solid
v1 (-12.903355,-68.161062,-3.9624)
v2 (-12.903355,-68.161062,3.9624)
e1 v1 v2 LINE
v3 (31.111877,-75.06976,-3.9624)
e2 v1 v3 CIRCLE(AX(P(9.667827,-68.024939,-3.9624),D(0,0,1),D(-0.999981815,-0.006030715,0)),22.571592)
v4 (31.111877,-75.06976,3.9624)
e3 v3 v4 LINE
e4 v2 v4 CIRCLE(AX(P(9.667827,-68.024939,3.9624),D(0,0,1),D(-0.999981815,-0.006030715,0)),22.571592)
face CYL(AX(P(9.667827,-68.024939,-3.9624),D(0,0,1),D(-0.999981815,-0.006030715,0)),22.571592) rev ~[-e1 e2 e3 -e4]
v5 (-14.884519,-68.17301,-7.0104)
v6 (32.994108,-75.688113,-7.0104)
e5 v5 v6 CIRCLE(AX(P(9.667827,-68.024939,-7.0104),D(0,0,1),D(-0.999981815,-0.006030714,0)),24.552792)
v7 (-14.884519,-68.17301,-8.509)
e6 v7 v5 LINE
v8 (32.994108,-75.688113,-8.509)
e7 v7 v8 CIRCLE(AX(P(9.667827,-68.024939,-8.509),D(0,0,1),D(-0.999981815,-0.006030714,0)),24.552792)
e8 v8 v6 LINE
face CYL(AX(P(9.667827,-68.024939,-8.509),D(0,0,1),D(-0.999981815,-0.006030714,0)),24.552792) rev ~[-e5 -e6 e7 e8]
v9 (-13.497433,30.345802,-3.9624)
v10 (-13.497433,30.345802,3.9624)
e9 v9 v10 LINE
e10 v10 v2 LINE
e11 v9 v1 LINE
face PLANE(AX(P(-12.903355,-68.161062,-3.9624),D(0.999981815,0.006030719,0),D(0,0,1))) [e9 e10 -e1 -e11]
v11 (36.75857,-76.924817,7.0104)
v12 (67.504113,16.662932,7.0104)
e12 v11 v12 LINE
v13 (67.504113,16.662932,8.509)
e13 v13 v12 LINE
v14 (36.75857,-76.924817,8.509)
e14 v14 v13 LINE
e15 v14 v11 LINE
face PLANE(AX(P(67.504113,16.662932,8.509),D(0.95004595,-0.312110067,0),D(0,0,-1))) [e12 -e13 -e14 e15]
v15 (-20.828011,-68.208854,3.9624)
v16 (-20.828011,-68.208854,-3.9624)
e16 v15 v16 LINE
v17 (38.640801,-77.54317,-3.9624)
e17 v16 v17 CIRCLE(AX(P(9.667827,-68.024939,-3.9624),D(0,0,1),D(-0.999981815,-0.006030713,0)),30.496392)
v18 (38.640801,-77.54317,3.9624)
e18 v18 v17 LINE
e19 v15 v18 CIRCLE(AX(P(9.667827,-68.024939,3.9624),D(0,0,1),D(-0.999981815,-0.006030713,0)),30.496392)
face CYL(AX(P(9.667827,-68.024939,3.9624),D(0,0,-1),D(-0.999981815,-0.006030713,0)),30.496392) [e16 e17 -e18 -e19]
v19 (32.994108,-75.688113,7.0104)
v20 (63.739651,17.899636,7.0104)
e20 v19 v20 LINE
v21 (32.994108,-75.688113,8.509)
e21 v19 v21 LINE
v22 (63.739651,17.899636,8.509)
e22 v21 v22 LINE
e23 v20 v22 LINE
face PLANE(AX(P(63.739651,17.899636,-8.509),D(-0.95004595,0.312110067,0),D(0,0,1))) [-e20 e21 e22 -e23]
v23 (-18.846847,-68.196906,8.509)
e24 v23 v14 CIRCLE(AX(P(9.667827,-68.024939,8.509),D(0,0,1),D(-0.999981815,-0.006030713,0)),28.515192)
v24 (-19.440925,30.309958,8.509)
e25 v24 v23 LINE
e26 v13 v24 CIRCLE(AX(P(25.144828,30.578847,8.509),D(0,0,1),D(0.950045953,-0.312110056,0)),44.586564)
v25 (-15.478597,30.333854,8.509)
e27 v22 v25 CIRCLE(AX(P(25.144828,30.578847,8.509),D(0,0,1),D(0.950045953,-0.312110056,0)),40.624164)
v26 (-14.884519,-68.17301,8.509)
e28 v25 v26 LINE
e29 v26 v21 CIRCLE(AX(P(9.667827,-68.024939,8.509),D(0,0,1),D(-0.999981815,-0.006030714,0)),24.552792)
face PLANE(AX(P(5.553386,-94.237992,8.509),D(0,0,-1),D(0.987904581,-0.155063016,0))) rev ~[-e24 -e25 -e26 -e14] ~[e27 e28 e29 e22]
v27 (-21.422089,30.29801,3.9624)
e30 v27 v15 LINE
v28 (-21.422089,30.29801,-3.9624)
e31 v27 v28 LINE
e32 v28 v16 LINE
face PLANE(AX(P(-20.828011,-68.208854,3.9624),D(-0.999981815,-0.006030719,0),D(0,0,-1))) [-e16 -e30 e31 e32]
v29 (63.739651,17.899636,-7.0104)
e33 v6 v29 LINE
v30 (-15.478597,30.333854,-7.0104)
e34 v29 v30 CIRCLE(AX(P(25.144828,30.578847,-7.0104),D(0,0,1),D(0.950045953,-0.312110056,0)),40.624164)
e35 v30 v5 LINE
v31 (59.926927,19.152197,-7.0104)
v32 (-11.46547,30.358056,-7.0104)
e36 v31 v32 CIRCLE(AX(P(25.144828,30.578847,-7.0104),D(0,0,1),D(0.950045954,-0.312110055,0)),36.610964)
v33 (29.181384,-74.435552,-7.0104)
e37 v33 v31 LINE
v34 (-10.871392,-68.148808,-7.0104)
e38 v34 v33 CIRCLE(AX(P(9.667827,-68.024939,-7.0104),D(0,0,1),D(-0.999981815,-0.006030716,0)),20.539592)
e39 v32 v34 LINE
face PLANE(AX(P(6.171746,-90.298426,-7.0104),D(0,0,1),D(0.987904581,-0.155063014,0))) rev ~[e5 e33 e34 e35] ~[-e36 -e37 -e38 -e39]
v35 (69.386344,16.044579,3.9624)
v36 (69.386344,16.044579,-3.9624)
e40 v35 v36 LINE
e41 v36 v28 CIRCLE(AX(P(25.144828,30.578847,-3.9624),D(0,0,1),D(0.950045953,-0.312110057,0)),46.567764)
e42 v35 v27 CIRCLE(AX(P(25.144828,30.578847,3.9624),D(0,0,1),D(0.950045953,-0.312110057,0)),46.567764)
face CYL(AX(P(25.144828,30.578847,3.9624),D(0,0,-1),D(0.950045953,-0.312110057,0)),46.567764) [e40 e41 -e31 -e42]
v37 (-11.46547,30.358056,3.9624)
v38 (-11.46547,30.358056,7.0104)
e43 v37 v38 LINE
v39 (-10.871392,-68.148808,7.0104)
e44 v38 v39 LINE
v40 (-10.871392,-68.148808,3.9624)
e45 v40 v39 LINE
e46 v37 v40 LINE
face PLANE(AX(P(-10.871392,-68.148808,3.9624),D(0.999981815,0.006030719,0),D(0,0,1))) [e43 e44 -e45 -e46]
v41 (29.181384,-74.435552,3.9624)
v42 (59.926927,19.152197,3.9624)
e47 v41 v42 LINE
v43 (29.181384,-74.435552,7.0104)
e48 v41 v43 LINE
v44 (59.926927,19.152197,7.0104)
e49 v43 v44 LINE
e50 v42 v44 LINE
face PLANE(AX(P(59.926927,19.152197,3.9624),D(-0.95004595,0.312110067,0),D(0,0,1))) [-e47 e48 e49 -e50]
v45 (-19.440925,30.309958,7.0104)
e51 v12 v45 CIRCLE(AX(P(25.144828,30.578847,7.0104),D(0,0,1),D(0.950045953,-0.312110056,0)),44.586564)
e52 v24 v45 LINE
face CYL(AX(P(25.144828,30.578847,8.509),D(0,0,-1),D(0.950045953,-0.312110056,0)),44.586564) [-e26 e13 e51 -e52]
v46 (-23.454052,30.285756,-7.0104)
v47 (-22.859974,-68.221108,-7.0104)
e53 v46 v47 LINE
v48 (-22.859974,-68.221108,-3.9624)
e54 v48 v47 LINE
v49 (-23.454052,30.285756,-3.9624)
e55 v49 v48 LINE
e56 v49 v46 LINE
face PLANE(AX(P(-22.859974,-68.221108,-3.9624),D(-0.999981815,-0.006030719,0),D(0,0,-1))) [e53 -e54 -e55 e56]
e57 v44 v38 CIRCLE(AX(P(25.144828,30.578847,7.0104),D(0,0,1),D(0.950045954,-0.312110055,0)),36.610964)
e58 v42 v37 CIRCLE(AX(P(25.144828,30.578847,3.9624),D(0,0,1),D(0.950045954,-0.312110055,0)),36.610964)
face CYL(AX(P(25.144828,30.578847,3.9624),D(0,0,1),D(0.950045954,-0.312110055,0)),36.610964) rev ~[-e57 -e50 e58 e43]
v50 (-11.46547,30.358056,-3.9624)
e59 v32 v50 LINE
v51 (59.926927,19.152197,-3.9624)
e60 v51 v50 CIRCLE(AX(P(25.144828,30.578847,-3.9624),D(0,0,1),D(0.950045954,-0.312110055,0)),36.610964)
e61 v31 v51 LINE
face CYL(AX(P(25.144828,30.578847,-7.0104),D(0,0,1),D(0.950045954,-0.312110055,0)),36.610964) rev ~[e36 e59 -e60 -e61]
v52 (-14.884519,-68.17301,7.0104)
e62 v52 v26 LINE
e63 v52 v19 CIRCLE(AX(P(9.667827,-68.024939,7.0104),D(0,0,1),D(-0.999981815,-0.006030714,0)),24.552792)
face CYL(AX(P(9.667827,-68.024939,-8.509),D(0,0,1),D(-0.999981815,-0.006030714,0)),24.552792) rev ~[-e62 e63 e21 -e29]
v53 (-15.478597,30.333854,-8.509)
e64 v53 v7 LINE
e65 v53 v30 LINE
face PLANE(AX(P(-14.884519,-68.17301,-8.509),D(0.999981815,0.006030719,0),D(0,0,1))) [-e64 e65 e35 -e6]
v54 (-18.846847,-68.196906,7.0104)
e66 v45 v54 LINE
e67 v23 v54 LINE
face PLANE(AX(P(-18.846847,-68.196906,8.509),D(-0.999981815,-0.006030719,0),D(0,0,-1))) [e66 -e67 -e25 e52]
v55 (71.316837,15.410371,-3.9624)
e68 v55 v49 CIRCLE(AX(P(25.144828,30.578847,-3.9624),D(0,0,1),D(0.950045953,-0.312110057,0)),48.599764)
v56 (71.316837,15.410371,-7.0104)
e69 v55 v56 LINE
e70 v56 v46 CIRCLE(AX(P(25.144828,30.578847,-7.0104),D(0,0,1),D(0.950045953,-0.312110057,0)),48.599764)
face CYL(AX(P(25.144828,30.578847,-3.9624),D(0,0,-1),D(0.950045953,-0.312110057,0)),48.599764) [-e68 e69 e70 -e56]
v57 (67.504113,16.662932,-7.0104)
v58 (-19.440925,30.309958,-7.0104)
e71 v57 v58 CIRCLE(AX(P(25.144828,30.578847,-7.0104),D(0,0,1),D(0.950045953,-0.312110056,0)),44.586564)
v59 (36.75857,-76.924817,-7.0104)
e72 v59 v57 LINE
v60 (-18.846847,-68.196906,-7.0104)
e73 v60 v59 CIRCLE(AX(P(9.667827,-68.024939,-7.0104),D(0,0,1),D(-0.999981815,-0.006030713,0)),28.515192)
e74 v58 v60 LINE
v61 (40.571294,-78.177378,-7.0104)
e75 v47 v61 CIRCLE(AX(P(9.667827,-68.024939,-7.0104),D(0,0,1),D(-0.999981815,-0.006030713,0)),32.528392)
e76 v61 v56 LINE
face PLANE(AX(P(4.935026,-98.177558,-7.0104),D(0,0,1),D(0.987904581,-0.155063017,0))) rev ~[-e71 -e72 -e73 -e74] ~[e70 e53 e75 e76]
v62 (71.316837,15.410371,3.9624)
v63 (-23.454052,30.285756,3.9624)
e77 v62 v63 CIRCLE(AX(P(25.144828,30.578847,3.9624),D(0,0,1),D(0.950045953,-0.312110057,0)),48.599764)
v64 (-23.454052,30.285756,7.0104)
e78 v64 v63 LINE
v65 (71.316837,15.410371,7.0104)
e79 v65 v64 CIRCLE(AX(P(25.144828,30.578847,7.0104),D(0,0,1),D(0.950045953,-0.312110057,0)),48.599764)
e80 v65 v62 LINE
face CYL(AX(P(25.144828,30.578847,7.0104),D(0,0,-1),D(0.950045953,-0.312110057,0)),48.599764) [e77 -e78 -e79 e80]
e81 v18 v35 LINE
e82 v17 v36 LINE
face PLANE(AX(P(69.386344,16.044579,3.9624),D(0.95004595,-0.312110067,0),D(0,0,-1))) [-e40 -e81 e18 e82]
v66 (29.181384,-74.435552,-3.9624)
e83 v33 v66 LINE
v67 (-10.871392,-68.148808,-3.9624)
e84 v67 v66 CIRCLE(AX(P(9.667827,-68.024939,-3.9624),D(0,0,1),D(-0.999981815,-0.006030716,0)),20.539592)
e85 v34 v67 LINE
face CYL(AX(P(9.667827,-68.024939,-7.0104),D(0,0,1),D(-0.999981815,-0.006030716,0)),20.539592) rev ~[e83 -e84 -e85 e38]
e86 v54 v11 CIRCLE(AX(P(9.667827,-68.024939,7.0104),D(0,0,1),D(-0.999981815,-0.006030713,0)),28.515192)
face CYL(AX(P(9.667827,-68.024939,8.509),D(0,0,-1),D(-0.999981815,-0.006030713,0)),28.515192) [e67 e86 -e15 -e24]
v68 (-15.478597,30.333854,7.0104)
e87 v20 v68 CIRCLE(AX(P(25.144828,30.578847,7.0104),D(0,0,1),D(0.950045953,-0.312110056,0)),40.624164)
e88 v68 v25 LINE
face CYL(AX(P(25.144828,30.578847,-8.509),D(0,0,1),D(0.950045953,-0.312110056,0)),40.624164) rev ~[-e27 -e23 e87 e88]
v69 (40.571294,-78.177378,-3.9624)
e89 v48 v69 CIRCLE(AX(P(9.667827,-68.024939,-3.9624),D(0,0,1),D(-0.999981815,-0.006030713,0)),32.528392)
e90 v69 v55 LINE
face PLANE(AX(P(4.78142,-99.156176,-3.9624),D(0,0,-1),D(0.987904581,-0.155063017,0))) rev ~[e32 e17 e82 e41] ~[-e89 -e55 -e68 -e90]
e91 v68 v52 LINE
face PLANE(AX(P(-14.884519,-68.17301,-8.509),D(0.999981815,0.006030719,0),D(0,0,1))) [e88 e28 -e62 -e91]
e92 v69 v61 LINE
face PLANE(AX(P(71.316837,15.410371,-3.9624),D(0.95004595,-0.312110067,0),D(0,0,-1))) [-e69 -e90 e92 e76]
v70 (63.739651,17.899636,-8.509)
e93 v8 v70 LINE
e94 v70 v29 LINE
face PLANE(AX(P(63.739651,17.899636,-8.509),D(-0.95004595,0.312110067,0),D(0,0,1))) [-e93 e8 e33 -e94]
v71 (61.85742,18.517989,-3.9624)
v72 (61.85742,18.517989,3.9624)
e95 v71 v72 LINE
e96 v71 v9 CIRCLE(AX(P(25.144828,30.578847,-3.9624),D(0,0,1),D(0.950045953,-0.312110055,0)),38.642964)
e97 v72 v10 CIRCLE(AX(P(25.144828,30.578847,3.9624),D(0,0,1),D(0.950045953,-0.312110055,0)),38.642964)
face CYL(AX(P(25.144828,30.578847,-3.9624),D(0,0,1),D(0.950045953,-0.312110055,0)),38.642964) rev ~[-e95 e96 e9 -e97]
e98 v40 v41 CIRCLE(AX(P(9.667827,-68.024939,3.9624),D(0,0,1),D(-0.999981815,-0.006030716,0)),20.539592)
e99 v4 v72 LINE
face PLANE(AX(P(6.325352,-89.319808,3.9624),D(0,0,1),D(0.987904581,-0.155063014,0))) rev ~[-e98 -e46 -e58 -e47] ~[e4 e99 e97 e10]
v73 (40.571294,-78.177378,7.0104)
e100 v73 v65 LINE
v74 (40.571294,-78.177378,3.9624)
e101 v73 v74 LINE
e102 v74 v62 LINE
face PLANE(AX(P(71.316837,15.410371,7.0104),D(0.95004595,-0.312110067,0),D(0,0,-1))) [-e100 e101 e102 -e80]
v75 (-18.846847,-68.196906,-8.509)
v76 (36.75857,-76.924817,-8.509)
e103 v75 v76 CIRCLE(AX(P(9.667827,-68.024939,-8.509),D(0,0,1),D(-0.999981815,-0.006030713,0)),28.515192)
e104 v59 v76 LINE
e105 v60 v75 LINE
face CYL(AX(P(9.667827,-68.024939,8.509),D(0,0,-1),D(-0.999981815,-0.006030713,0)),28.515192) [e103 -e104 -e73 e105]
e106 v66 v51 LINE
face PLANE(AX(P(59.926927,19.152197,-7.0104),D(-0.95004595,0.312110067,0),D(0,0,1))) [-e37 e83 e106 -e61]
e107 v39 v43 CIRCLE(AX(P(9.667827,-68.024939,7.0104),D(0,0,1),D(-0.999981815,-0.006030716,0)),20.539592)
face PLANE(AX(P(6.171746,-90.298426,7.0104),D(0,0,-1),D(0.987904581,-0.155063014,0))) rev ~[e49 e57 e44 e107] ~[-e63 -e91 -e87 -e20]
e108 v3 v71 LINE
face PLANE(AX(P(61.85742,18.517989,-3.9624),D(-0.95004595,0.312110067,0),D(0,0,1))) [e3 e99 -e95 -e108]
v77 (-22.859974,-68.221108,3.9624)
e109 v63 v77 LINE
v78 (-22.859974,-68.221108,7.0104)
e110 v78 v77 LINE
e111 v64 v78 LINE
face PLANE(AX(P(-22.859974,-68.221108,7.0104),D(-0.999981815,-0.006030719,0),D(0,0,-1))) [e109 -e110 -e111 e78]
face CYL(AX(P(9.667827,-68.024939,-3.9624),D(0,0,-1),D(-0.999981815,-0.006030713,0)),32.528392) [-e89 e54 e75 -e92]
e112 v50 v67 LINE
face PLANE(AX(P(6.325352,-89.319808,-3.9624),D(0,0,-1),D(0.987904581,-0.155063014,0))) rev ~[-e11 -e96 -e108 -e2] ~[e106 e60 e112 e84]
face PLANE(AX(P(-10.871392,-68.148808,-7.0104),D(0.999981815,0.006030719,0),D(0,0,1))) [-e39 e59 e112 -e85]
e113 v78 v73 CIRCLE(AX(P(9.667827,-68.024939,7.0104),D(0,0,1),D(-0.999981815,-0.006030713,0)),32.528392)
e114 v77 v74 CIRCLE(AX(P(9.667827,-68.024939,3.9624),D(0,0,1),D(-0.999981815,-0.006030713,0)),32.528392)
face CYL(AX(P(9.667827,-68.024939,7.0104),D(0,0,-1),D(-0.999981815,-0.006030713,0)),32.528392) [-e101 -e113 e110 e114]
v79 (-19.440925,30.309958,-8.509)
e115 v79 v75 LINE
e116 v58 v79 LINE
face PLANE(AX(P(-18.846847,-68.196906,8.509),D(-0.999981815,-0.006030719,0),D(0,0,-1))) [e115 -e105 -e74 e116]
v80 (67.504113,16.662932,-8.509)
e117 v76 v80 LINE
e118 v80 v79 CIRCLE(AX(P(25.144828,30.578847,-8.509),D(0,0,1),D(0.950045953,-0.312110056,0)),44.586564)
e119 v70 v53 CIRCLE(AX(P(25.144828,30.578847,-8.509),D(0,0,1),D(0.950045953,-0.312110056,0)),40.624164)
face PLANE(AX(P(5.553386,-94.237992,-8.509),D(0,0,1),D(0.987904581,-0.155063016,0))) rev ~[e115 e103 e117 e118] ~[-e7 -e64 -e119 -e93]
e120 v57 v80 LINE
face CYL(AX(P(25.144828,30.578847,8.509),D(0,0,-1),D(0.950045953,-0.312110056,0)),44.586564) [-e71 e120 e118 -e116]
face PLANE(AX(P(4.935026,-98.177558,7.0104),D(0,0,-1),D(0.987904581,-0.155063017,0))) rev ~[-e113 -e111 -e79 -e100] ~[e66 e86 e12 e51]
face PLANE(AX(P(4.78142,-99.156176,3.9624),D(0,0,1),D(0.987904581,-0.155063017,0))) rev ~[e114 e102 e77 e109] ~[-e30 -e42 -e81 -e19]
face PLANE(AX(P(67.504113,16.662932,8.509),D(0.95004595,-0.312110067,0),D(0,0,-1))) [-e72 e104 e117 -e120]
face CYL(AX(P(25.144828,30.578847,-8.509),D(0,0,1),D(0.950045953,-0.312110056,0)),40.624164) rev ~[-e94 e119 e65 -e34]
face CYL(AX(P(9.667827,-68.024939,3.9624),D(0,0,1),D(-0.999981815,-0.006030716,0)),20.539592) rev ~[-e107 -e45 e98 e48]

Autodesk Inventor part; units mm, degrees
ref_plane "Work Plane2" through (25.144829, 30.578847, 0) normal (-1, 0, 0) x (0, 0, 1)
ref_plane "Work Plane3" through (9.667827, -68.024939, 0) normal (0.6946503, 0.7193476, 0) x (0, 0, 1)
sketch "Path" plane through (0, 0, 0) normal (0, 0, 1) x (1, 0, 0)
  arc A0 (65.621882, 17.281284) -> (-17.459761, 30.321906) centre (25.144829, 30.578847) ccw
  arc A1 (-16.865683, -68.184958) -> (34.876339, -76.306465) centre (9.667827, -68.024939) ccw
  line L0 (-16.865683, -68.184958) -> (-17.459761, 30.321906)
  line L1 (65.621882, 17.281284) -> (34.876339, -76.306465)
  dimension "d31" = 11.9888
ref_plane "Section Plane" through (-17.459761, 30.321906, 0) normal (0.0060307, -0.9999818, 0) x (0, 0, 1)
sketch "Section Sketch" plane through (-17.459761, 30.321906, 0) normal (0.0060307, -0.9999818, 0) x (0, 0, 1)
  line L0 (-8.509, -1.9812) -> (8.509, -1.9812)
  line L1 (8.509, -1.9812) -> (8.509, 1.9812)
  line L2 (8.509, 1.9812) -> (-8.509, 1.9812)
  line L3 (-8.509, 1.9812) -> (-8.509, -1.9812)
  line L4 (-3.9624, -3.9624) -> (3.9624, -3.9624)
  line L5 (3.9624, -3.9624) -> (3.9624, 3.9624)
  line L6 (3.9624, 3.9624) -> (-3.9624, 3.9624)
  line L7 (-3.9624, 3.9624) -> (-3.9624, -3.9624)
  line L8 (-3.9624, 0) -> (3.9624, 0) construction
  line L9 (-7.0104, -5.9944) -> (-3.9624, -5.9944)
  line L10 (-3.9624, -5.9944) -> (-3.9624, 5.9944)
  line L11 (-3.9624, 5.9944) -> (-7.0104, 5.9944)
  line L12 (-7.0104, 5.9944) -> (-7.0104, -5.9944)
  line L13 (3.9624, -5.9944) -> (7.0104, -5.9944)
  line L14 (7.0104, -5.9944) -> (7.0104, 5.9944)
  line L15 (7.0104, 5.9944) -> (3.9624, 5.9944)
  line L16 (3.9624, 5.9944) -> (3.9624, -5.9944)
  line L17 (-8.509, 0) -> (8.509, 0) construction
  point P0 (0, 0)
  point P1 (0, 0)
  dimension "d21" = 3.9624
  dimension "d22" = 7.9248
  dimension "d23" = 7.9248
  dimension "d24" = 3.048
  dimension "d31" = 11.9888
  dimension "d32" = 17.018
sweep "Solid" add profiles "Section Sketch" path "Path"
pattern_of_one "Strand Pattern"
equation "\"d21\" = da_d2"
equation "\"d22\" = da_d1"
equation "\"d23\" = da_b1"
equation "\"d24\" = da_t1 + da_t2"
equation "\"d30\" = da_pt"
equation "\"da_p\" = 12.7"
equation "\"da_b1\" = 7.9248"
equation "\"da_h2\" = 11.9888"
equation "\"da_h3\" = 10.3886"
equation "\"da_d1\" = 7.9248"
equation "\"da_d2\" = 3.9624"
equation "\"da_pt\" = 14.3764"
equation "\"da_b\" = 17.018"
equation "\"da_t1\" = 1.524"
equation "\"da_t2\" = 1.524"
properties part number "Roller Chain"
